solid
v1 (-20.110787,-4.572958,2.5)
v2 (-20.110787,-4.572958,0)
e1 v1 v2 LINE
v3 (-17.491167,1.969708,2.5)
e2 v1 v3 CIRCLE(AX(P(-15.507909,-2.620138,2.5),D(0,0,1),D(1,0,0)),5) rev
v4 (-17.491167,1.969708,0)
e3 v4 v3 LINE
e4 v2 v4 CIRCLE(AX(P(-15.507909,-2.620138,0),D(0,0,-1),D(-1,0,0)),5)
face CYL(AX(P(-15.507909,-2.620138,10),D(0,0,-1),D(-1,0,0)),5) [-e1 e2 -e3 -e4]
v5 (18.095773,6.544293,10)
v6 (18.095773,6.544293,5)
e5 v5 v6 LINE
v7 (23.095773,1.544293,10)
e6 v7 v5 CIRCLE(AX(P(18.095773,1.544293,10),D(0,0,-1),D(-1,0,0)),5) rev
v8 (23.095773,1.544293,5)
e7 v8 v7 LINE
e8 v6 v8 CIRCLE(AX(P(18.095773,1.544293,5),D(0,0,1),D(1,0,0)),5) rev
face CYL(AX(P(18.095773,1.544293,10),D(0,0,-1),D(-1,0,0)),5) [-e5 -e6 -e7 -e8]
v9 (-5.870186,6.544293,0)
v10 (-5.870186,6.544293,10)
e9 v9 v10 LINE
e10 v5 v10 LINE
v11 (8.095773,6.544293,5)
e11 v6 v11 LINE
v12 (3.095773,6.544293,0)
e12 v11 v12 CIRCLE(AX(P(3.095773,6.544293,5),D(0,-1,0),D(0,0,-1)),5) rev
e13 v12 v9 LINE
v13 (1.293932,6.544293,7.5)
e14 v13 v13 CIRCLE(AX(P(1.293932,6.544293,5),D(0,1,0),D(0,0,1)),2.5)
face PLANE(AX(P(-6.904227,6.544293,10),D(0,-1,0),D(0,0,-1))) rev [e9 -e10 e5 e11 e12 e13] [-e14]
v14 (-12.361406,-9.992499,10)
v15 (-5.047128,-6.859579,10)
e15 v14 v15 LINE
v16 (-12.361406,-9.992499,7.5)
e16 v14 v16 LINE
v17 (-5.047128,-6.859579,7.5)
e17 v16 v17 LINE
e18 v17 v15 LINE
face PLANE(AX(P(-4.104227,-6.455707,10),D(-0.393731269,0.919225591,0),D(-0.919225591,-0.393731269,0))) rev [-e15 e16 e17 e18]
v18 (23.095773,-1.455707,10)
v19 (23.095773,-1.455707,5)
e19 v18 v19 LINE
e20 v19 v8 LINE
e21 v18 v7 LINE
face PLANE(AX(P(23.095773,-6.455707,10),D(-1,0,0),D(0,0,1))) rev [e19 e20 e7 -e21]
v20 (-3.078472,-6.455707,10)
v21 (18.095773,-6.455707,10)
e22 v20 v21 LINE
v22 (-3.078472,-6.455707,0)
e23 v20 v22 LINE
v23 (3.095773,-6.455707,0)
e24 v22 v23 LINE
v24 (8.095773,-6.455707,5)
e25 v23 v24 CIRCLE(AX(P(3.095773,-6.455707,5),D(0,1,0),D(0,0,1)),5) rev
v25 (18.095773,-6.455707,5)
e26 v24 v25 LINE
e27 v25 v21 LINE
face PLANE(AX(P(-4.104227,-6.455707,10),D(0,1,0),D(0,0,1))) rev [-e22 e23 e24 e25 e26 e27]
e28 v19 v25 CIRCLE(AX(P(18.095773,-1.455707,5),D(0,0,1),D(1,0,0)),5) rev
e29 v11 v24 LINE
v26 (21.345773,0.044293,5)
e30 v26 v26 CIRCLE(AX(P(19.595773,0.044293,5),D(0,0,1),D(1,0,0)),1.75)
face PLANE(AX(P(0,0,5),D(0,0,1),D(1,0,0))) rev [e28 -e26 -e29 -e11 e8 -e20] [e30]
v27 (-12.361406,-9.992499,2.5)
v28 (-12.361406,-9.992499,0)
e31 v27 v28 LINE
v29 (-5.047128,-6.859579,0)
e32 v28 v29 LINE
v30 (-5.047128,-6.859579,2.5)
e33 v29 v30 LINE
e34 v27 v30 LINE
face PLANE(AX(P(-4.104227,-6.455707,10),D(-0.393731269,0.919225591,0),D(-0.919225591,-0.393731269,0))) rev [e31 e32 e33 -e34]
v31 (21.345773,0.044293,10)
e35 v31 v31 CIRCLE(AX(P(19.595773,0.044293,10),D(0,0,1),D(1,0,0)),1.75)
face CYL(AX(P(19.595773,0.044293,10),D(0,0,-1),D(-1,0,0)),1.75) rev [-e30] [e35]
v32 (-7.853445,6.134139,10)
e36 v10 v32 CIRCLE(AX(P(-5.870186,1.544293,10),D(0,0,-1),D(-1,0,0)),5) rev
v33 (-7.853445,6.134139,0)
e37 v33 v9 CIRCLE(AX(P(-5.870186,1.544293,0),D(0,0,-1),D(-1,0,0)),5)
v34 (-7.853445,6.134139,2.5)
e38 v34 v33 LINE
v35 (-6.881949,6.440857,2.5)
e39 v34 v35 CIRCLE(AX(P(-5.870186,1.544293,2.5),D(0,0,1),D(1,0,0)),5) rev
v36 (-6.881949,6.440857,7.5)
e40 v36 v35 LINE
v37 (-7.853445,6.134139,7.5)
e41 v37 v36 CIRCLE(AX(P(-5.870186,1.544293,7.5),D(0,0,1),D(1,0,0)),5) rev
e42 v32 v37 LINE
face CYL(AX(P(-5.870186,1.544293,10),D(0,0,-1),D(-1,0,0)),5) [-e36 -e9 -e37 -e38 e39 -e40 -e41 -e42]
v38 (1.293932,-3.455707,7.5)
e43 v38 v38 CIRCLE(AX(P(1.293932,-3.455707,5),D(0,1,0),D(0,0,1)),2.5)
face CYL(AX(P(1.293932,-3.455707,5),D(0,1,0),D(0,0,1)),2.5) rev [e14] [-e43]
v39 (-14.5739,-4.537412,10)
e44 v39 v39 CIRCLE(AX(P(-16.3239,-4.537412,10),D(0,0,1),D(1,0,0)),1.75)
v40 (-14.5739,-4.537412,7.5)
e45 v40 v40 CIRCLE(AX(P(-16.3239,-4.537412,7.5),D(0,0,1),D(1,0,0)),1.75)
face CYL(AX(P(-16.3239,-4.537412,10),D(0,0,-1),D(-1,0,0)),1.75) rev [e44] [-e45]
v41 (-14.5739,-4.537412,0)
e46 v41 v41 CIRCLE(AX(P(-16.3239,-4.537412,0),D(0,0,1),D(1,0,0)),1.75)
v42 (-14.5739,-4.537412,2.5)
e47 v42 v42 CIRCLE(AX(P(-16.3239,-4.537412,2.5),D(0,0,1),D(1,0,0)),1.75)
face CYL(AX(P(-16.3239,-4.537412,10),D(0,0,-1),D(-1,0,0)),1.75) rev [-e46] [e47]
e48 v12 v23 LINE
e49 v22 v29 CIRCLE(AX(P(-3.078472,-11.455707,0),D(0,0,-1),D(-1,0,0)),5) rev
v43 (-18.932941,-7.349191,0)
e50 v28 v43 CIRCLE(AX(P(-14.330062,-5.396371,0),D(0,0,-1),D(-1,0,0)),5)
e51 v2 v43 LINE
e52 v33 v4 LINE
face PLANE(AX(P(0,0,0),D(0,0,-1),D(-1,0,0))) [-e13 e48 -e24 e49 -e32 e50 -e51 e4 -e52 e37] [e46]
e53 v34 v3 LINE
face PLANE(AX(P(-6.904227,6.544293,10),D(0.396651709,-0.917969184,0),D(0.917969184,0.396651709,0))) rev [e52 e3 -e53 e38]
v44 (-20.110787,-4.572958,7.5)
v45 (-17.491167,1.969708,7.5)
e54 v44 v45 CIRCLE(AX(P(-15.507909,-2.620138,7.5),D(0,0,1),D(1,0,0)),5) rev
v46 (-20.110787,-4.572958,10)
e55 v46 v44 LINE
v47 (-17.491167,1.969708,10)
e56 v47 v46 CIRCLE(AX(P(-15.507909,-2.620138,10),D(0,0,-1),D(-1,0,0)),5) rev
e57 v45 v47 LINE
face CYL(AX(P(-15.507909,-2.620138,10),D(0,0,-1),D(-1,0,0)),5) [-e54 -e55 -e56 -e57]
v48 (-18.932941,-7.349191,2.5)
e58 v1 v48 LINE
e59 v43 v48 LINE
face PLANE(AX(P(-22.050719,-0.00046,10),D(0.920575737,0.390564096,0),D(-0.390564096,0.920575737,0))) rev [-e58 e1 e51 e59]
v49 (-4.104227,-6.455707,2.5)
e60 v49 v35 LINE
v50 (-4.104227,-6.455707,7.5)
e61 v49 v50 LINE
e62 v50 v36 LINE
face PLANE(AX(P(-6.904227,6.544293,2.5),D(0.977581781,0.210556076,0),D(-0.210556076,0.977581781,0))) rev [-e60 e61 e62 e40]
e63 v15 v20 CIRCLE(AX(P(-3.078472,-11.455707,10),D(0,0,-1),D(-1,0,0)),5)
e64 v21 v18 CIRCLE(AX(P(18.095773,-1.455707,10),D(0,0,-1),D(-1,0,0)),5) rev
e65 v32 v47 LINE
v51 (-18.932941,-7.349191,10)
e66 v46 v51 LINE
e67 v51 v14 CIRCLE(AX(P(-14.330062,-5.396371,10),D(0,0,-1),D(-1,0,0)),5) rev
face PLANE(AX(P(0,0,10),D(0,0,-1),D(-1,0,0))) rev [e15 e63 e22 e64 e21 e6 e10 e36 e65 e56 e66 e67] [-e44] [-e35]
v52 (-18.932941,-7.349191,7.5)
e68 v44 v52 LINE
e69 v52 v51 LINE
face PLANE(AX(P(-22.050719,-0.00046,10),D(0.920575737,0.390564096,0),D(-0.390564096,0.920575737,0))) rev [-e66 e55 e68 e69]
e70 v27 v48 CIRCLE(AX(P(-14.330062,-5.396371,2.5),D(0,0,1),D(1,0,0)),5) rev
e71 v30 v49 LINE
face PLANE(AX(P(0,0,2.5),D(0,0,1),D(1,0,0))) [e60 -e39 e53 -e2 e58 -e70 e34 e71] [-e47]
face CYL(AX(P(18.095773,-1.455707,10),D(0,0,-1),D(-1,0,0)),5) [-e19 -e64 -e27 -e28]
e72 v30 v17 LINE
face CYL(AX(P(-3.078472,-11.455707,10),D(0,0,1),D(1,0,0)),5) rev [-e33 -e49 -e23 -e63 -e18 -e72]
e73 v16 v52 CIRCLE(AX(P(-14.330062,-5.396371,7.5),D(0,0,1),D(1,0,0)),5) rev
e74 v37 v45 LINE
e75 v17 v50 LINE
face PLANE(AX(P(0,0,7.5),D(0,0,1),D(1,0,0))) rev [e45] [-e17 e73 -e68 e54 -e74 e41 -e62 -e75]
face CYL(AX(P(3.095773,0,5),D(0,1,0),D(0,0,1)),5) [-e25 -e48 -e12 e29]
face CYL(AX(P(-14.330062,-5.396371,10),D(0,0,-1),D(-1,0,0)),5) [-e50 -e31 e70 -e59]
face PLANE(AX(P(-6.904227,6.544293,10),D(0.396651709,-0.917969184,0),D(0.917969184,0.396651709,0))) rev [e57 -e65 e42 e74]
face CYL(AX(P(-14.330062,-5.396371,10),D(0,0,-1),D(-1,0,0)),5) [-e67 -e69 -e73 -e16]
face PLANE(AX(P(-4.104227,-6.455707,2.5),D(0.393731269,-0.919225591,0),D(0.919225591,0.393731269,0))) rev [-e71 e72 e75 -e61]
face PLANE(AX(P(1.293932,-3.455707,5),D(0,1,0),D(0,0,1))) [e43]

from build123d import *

# Parameters (mm, degrees)
SKETCH_1_R           = 1.75
EXTRUDE_1_DEPTH      = 10
FILLET_8_R           = 5
CUT_EXTRUDE_7_DEPTH  = 2.5
CUT_EXTRUDE_8_DEPTH  = 2.5
CUT_EXTRUDE_9_DEPTH  = 5
FILLET_10_R          = 5
SKETCH_12_R          = 2.5
CUT_EXTRUDE_10_DEPTH = 10


with BuildPart() as part:
    # 스케치1 → 보스-돌출1 (new body)
    with BuildSketch(Plane.XY):
        Polygon((-6.904227126, 6.544293027), (-22.050718655, -0.000460165), (-16.973385404, -11.96794474), (-4.104227126, -6.455706973), (23.095772874, -6.455706973), (23.095772874, 6.544293027), align=None)
        with Locations((-16.323899965, -4.537411593)):
            Circle(SKETCH_1_R, mode=Mode.SUBTRACT)
        with Locations((19.595772874, 0.044293027)):
            Circle(SKETCH_1_R, mode=Mode.SUBTRACT)
    extrude(amount=EXTRUDE_1_DEPTH)

    # 필렛8
    fillet_8_edges = [part.edges().sort_by_distance(p)[0] for p in [
        (23.095772874, -6.455706973, 5),
        (-4.104227126, -6.455706973, 5),
        (-16.973385404, -11.96794474, 5),
        (-22.050718655, -0.000460165, 5),
        (-6.904227126, 6.544293027, 5),
        (23.095772874, 6.544293027, 5),
    ]]
    fillet(fillet_8_edges, radius=FILLET_8_R)

    # 스케치9 → 컷-돌출7 (cut)
    with BuildSketch(Plane.XY.offset(5)):
        Polygon((-22.050718655, -0.000460165), (-6.904227126, 6.544293027), (-4.104227126, -6.455706973), (-16.973385404, -11.96794474), align=None)
    extrude(amount=-CUT_EXTRUDE_7_DEPTH, mode=Mode.SUBTRACT)

    # 스케치10 → 컷-돌출8 (cut)
    with BuildSketch(Plane.XY.offset(5)):
        Polygon((-22.050718655, -0.000460165), (-6.904227126, 6.544293027), (-4.104227126, -6.455706973), (-16.973385404, -11.96794474), align=None)
    extrude(amount=CUT_EXTRUDE_8_DEPTH, mode=Mode.SUBTRACT)

    # 스케치11 → 컷-돌출9 (cut)
    with BuildSketch(Plane.XY.offset(5)):
        Polygon((8.095772874, 6.544293027), (23.109867502, 6.568608602), (23.095772874, -6.455706973), (8.095772874, -6.455706973), align=None)
    extrude(amount=-CUT_EXTRUDE_9_DEPTH, mode=Mode.SUBTRACT)

    # 필렛10
    fillet_10_edges = [part.edges().sort_by_distance(p)[0] for p in [
        (8.095772874, 0.044293027, 0),
    ]]
    fillet(fillet_10_edges, radius=FILLET_10_R - 0.0001)  # a hair under: the kernel refuses the full size

    # 스케치12 → 컷-돌출10 (cut)
    with BuildSketch(Plane(origin=(0, 6.544293027, 0), x_dir=(1, 0, 0), z_dir=(0, 1, 0))):
        with Locations(Location((1.29393204, -5, 0), (0, 0, 270))):
            Circle(SKETCH_12_R)
    extrude(amount=-CUT_EXTRUDE_10_DEPTH, mode=Mode.SUBTRACT)


solid = part.part
